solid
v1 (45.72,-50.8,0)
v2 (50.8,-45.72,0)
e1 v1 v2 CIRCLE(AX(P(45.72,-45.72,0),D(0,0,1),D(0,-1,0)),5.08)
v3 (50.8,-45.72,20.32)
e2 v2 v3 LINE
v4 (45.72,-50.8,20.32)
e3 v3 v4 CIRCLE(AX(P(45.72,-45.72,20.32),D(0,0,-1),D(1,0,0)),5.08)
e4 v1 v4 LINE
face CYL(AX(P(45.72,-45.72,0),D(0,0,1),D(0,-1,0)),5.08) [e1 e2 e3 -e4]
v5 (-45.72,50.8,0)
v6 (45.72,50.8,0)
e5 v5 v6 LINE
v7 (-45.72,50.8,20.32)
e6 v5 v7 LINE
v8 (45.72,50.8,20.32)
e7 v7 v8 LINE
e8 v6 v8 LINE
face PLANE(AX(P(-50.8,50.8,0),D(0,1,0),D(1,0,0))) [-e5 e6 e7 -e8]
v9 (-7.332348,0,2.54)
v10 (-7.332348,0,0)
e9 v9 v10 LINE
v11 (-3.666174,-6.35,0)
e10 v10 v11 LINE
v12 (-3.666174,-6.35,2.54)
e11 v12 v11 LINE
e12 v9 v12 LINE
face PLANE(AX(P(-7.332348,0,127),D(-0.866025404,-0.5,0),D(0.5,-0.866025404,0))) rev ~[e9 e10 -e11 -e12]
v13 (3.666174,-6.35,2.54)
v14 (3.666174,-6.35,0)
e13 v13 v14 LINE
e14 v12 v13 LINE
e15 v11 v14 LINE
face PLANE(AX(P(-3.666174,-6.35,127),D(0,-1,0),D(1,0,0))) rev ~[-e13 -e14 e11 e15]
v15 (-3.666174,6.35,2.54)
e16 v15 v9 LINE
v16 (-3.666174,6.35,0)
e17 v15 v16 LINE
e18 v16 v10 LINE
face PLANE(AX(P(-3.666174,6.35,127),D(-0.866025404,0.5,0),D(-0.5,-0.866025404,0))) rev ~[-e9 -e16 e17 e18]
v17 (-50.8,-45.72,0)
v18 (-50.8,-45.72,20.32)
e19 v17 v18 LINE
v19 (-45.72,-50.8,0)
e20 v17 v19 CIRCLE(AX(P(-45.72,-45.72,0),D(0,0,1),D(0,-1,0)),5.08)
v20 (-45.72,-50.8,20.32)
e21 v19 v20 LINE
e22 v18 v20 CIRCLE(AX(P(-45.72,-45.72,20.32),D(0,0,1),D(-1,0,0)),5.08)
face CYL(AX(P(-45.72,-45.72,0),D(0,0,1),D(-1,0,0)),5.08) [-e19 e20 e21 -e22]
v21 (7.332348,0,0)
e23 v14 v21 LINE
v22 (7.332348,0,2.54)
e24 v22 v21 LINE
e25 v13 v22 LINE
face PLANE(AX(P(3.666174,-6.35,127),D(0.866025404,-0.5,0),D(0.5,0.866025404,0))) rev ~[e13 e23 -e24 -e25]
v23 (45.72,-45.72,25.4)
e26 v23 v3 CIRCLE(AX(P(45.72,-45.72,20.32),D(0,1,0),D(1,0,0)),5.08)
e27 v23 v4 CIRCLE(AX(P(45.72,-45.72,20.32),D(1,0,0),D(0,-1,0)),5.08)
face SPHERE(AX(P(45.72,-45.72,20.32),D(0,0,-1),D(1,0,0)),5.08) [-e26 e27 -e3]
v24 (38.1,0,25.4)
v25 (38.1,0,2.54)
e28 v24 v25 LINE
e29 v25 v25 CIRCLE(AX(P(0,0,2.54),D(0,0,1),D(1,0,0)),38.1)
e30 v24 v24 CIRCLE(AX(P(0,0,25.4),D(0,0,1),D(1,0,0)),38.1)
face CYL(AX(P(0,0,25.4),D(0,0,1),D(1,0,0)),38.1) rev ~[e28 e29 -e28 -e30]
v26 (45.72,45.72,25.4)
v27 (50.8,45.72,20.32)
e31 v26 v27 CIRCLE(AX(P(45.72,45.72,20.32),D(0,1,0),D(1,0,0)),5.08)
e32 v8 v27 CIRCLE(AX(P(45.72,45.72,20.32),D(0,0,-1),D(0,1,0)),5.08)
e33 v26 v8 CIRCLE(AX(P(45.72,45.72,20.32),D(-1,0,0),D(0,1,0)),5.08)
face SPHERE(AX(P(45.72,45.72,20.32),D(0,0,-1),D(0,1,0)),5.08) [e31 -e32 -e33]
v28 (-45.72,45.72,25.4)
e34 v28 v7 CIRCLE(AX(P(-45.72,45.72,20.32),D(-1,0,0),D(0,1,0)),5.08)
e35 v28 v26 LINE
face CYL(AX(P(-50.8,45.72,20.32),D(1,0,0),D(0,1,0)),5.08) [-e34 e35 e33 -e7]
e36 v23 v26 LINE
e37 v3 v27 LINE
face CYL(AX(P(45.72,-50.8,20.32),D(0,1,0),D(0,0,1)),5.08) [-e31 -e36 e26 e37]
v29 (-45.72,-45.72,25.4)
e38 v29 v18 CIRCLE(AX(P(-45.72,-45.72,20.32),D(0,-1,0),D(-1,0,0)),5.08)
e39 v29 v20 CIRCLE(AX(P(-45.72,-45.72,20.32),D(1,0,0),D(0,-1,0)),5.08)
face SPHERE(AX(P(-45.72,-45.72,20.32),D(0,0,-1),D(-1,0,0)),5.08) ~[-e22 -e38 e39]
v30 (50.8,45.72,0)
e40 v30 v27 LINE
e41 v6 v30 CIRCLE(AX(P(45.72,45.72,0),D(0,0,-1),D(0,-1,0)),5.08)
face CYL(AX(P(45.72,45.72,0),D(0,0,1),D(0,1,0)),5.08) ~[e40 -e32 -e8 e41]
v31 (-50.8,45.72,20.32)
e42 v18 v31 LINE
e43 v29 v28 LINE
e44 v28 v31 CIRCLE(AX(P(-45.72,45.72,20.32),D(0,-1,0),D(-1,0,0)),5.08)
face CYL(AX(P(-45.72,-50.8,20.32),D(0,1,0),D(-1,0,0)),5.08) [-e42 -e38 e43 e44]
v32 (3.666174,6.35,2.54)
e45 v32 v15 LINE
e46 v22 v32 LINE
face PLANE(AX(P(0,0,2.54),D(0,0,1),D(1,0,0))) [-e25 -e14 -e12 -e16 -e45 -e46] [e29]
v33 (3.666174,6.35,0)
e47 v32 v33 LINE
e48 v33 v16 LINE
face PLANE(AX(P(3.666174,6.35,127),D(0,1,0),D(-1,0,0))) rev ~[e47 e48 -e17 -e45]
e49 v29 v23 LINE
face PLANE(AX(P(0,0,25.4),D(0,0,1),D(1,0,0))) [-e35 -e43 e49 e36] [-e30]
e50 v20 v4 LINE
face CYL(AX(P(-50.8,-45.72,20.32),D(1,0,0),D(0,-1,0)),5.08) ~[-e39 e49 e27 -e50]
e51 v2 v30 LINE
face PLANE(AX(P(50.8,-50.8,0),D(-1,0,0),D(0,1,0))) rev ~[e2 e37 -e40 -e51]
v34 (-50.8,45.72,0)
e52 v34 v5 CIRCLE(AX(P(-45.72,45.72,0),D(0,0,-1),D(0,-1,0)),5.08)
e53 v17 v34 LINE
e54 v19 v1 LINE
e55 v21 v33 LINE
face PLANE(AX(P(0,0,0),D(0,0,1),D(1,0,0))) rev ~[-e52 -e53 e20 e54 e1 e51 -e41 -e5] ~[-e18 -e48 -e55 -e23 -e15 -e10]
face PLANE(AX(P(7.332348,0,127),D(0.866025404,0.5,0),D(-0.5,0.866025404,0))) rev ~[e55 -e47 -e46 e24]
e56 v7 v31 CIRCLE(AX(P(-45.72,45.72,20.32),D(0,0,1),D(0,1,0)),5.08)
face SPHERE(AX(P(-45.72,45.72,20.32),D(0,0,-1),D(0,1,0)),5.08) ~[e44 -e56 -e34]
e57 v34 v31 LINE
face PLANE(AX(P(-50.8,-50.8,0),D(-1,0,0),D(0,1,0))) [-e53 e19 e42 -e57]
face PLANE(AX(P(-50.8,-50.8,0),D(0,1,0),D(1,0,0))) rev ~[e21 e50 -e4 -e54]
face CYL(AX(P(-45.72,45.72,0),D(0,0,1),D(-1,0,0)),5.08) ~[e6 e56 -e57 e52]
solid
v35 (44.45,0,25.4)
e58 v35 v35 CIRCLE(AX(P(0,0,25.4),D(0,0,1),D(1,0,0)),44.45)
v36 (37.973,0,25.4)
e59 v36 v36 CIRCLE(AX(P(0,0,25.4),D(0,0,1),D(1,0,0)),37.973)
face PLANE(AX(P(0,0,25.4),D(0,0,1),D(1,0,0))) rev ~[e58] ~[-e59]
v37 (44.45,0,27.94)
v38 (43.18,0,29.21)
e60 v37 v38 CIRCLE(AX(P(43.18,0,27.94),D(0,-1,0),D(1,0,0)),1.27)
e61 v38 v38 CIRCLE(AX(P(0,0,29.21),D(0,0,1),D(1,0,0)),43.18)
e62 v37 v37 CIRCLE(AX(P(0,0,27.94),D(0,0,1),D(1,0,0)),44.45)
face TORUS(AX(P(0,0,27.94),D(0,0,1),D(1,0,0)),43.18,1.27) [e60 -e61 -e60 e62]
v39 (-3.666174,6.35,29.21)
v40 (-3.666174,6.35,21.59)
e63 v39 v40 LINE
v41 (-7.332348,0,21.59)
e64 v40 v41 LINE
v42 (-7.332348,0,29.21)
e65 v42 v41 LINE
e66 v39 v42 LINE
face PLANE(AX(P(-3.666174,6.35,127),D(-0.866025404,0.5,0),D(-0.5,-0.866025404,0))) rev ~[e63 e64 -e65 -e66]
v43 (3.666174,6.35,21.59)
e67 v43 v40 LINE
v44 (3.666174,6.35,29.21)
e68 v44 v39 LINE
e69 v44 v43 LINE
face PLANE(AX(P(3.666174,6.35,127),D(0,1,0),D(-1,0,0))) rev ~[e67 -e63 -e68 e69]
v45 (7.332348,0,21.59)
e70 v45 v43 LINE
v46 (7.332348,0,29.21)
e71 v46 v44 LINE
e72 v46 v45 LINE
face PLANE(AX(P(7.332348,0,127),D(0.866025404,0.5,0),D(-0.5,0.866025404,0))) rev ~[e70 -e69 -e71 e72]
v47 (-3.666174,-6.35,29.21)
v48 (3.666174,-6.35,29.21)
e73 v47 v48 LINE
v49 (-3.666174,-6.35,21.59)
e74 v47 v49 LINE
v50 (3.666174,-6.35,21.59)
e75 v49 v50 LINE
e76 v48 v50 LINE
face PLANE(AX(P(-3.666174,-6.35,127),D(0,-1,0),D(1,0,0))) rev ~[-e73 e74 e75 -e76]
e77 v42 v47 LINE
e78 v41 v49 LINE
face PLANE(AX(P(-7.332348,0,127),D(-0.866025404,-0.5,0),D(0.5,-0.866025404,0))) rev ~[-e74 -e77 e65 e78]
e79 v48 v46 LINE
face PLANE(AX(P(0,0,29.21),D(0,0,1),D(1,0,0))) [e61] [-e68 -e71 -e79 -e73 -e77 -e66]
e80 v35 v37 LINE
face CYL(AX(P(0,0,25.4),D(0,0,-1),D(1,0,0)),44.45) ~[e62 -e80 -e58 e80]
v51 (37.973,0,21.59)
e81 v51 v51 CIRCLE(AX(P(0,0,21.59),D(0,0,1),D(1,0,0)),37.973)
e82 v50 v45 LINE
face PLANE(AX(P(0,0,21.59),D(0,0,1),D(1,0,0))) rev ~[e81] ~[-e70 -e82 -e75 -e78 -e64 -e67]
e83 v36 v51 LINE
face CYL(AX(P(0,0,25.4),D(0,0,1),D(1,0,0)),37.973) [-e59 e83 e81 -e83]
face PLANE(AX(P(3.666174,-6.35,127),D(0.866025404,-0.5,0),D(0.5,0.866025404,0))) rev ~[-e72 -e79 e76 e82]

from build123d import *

# Parameters (mm, degrees)
F0_W      = 101.6
F0_H      = 101.6
F1_DEPTH  = 25.4
F2_R      = 38.1
F3_DEPTH  = 22.86
F4_R      = 37.973
F5_DEPTH  = 3.81
F6_R      = 44.45
F6_R_2    = 37.973
F7_DEPTH  = 3.81
F8_R      = 5.08
F9_R      = 1.27
F12_DEPTH = 248.92


with BuildPart() as f1:
    # F0 (on Top) → F1 (new body)
    with BuildSketch(Plane.XY):
        Rectangle(F0_W, F0_H)
    extrude(amount=F1_DEPTH)

    # F2 (on face) → F3 (cut)
    with BuildSketch(Plane.XY.offset(25.4)):
        Circle(F2_R)
    extrude(amount=-F3_DEPTH, mode=Mode.SUBTRACT)

    # F8
    f8_edges = [f1.edges().sort_by_distance(p)[0] for p in [
        (-50.8, -50.8, 12.7),
        (50.8, -50.8, 12.7),
        (50.8, 50.8, 12.7),
        (-50.8, 50.8, 12.7),
        (0, 50.8, 25.4),
        (-50.8, 0, 25.4),
        (50.8, 0, 25.4),
        (0, -50.8, 25.4),
    ]]
    fillet(f8_edges, radius=F8_R)


with BuildPart() as f5:
    # F4 (on face) → F5 (new body)
    with BuildSketch(Plane.XY.offset(25.4)):
        Circle(F4_R)
    extrude(amount=-F5_DEPTH)

    # F6 (on face) → F7 (join)
    with BuildSketch(Plane.XY.offset(25.4)):
        Circle(F6_R)
        Circle(F6_R_2, mode=Mode.SUBTRACT)
        Circle(F6_R_2)
    extrude(amount=F7_DEPTH)

    # F9
    f9_edges = [f5.edges().sort_by_distance(p)[0] for p in [
        (-44.45, 0, 29.21),
    ]]
    fillet(f9_edges, radius=F9_R)


with BuildPart() as f12:
    # F11 (on offset) → F12 (new body)
    with BuildSketch(Plane.XY.offset(127)):
        Polygon((3.6661742094, 6.35), (-3.6661742094, 6.35), (-7.3323484187, 0), (-3.6661742094, -6.35), (3.6661742094, -6.35), (7.3323484187, 0), align=None)
    extrude(amount=-F12_DEPTH)


with BuildPart() as f1_1:
    add(f1.part)

    # F13: cut F12
    add(f12.part, mode=Mode.SUBTRACT)


with BuildPart() as f5_1:
    add(f5.part)

    # F13: cut F12
    add(f12.part, mode=Mode.SUBTRACT)


solid = Compound([f1_1.part, f5_1.part])
